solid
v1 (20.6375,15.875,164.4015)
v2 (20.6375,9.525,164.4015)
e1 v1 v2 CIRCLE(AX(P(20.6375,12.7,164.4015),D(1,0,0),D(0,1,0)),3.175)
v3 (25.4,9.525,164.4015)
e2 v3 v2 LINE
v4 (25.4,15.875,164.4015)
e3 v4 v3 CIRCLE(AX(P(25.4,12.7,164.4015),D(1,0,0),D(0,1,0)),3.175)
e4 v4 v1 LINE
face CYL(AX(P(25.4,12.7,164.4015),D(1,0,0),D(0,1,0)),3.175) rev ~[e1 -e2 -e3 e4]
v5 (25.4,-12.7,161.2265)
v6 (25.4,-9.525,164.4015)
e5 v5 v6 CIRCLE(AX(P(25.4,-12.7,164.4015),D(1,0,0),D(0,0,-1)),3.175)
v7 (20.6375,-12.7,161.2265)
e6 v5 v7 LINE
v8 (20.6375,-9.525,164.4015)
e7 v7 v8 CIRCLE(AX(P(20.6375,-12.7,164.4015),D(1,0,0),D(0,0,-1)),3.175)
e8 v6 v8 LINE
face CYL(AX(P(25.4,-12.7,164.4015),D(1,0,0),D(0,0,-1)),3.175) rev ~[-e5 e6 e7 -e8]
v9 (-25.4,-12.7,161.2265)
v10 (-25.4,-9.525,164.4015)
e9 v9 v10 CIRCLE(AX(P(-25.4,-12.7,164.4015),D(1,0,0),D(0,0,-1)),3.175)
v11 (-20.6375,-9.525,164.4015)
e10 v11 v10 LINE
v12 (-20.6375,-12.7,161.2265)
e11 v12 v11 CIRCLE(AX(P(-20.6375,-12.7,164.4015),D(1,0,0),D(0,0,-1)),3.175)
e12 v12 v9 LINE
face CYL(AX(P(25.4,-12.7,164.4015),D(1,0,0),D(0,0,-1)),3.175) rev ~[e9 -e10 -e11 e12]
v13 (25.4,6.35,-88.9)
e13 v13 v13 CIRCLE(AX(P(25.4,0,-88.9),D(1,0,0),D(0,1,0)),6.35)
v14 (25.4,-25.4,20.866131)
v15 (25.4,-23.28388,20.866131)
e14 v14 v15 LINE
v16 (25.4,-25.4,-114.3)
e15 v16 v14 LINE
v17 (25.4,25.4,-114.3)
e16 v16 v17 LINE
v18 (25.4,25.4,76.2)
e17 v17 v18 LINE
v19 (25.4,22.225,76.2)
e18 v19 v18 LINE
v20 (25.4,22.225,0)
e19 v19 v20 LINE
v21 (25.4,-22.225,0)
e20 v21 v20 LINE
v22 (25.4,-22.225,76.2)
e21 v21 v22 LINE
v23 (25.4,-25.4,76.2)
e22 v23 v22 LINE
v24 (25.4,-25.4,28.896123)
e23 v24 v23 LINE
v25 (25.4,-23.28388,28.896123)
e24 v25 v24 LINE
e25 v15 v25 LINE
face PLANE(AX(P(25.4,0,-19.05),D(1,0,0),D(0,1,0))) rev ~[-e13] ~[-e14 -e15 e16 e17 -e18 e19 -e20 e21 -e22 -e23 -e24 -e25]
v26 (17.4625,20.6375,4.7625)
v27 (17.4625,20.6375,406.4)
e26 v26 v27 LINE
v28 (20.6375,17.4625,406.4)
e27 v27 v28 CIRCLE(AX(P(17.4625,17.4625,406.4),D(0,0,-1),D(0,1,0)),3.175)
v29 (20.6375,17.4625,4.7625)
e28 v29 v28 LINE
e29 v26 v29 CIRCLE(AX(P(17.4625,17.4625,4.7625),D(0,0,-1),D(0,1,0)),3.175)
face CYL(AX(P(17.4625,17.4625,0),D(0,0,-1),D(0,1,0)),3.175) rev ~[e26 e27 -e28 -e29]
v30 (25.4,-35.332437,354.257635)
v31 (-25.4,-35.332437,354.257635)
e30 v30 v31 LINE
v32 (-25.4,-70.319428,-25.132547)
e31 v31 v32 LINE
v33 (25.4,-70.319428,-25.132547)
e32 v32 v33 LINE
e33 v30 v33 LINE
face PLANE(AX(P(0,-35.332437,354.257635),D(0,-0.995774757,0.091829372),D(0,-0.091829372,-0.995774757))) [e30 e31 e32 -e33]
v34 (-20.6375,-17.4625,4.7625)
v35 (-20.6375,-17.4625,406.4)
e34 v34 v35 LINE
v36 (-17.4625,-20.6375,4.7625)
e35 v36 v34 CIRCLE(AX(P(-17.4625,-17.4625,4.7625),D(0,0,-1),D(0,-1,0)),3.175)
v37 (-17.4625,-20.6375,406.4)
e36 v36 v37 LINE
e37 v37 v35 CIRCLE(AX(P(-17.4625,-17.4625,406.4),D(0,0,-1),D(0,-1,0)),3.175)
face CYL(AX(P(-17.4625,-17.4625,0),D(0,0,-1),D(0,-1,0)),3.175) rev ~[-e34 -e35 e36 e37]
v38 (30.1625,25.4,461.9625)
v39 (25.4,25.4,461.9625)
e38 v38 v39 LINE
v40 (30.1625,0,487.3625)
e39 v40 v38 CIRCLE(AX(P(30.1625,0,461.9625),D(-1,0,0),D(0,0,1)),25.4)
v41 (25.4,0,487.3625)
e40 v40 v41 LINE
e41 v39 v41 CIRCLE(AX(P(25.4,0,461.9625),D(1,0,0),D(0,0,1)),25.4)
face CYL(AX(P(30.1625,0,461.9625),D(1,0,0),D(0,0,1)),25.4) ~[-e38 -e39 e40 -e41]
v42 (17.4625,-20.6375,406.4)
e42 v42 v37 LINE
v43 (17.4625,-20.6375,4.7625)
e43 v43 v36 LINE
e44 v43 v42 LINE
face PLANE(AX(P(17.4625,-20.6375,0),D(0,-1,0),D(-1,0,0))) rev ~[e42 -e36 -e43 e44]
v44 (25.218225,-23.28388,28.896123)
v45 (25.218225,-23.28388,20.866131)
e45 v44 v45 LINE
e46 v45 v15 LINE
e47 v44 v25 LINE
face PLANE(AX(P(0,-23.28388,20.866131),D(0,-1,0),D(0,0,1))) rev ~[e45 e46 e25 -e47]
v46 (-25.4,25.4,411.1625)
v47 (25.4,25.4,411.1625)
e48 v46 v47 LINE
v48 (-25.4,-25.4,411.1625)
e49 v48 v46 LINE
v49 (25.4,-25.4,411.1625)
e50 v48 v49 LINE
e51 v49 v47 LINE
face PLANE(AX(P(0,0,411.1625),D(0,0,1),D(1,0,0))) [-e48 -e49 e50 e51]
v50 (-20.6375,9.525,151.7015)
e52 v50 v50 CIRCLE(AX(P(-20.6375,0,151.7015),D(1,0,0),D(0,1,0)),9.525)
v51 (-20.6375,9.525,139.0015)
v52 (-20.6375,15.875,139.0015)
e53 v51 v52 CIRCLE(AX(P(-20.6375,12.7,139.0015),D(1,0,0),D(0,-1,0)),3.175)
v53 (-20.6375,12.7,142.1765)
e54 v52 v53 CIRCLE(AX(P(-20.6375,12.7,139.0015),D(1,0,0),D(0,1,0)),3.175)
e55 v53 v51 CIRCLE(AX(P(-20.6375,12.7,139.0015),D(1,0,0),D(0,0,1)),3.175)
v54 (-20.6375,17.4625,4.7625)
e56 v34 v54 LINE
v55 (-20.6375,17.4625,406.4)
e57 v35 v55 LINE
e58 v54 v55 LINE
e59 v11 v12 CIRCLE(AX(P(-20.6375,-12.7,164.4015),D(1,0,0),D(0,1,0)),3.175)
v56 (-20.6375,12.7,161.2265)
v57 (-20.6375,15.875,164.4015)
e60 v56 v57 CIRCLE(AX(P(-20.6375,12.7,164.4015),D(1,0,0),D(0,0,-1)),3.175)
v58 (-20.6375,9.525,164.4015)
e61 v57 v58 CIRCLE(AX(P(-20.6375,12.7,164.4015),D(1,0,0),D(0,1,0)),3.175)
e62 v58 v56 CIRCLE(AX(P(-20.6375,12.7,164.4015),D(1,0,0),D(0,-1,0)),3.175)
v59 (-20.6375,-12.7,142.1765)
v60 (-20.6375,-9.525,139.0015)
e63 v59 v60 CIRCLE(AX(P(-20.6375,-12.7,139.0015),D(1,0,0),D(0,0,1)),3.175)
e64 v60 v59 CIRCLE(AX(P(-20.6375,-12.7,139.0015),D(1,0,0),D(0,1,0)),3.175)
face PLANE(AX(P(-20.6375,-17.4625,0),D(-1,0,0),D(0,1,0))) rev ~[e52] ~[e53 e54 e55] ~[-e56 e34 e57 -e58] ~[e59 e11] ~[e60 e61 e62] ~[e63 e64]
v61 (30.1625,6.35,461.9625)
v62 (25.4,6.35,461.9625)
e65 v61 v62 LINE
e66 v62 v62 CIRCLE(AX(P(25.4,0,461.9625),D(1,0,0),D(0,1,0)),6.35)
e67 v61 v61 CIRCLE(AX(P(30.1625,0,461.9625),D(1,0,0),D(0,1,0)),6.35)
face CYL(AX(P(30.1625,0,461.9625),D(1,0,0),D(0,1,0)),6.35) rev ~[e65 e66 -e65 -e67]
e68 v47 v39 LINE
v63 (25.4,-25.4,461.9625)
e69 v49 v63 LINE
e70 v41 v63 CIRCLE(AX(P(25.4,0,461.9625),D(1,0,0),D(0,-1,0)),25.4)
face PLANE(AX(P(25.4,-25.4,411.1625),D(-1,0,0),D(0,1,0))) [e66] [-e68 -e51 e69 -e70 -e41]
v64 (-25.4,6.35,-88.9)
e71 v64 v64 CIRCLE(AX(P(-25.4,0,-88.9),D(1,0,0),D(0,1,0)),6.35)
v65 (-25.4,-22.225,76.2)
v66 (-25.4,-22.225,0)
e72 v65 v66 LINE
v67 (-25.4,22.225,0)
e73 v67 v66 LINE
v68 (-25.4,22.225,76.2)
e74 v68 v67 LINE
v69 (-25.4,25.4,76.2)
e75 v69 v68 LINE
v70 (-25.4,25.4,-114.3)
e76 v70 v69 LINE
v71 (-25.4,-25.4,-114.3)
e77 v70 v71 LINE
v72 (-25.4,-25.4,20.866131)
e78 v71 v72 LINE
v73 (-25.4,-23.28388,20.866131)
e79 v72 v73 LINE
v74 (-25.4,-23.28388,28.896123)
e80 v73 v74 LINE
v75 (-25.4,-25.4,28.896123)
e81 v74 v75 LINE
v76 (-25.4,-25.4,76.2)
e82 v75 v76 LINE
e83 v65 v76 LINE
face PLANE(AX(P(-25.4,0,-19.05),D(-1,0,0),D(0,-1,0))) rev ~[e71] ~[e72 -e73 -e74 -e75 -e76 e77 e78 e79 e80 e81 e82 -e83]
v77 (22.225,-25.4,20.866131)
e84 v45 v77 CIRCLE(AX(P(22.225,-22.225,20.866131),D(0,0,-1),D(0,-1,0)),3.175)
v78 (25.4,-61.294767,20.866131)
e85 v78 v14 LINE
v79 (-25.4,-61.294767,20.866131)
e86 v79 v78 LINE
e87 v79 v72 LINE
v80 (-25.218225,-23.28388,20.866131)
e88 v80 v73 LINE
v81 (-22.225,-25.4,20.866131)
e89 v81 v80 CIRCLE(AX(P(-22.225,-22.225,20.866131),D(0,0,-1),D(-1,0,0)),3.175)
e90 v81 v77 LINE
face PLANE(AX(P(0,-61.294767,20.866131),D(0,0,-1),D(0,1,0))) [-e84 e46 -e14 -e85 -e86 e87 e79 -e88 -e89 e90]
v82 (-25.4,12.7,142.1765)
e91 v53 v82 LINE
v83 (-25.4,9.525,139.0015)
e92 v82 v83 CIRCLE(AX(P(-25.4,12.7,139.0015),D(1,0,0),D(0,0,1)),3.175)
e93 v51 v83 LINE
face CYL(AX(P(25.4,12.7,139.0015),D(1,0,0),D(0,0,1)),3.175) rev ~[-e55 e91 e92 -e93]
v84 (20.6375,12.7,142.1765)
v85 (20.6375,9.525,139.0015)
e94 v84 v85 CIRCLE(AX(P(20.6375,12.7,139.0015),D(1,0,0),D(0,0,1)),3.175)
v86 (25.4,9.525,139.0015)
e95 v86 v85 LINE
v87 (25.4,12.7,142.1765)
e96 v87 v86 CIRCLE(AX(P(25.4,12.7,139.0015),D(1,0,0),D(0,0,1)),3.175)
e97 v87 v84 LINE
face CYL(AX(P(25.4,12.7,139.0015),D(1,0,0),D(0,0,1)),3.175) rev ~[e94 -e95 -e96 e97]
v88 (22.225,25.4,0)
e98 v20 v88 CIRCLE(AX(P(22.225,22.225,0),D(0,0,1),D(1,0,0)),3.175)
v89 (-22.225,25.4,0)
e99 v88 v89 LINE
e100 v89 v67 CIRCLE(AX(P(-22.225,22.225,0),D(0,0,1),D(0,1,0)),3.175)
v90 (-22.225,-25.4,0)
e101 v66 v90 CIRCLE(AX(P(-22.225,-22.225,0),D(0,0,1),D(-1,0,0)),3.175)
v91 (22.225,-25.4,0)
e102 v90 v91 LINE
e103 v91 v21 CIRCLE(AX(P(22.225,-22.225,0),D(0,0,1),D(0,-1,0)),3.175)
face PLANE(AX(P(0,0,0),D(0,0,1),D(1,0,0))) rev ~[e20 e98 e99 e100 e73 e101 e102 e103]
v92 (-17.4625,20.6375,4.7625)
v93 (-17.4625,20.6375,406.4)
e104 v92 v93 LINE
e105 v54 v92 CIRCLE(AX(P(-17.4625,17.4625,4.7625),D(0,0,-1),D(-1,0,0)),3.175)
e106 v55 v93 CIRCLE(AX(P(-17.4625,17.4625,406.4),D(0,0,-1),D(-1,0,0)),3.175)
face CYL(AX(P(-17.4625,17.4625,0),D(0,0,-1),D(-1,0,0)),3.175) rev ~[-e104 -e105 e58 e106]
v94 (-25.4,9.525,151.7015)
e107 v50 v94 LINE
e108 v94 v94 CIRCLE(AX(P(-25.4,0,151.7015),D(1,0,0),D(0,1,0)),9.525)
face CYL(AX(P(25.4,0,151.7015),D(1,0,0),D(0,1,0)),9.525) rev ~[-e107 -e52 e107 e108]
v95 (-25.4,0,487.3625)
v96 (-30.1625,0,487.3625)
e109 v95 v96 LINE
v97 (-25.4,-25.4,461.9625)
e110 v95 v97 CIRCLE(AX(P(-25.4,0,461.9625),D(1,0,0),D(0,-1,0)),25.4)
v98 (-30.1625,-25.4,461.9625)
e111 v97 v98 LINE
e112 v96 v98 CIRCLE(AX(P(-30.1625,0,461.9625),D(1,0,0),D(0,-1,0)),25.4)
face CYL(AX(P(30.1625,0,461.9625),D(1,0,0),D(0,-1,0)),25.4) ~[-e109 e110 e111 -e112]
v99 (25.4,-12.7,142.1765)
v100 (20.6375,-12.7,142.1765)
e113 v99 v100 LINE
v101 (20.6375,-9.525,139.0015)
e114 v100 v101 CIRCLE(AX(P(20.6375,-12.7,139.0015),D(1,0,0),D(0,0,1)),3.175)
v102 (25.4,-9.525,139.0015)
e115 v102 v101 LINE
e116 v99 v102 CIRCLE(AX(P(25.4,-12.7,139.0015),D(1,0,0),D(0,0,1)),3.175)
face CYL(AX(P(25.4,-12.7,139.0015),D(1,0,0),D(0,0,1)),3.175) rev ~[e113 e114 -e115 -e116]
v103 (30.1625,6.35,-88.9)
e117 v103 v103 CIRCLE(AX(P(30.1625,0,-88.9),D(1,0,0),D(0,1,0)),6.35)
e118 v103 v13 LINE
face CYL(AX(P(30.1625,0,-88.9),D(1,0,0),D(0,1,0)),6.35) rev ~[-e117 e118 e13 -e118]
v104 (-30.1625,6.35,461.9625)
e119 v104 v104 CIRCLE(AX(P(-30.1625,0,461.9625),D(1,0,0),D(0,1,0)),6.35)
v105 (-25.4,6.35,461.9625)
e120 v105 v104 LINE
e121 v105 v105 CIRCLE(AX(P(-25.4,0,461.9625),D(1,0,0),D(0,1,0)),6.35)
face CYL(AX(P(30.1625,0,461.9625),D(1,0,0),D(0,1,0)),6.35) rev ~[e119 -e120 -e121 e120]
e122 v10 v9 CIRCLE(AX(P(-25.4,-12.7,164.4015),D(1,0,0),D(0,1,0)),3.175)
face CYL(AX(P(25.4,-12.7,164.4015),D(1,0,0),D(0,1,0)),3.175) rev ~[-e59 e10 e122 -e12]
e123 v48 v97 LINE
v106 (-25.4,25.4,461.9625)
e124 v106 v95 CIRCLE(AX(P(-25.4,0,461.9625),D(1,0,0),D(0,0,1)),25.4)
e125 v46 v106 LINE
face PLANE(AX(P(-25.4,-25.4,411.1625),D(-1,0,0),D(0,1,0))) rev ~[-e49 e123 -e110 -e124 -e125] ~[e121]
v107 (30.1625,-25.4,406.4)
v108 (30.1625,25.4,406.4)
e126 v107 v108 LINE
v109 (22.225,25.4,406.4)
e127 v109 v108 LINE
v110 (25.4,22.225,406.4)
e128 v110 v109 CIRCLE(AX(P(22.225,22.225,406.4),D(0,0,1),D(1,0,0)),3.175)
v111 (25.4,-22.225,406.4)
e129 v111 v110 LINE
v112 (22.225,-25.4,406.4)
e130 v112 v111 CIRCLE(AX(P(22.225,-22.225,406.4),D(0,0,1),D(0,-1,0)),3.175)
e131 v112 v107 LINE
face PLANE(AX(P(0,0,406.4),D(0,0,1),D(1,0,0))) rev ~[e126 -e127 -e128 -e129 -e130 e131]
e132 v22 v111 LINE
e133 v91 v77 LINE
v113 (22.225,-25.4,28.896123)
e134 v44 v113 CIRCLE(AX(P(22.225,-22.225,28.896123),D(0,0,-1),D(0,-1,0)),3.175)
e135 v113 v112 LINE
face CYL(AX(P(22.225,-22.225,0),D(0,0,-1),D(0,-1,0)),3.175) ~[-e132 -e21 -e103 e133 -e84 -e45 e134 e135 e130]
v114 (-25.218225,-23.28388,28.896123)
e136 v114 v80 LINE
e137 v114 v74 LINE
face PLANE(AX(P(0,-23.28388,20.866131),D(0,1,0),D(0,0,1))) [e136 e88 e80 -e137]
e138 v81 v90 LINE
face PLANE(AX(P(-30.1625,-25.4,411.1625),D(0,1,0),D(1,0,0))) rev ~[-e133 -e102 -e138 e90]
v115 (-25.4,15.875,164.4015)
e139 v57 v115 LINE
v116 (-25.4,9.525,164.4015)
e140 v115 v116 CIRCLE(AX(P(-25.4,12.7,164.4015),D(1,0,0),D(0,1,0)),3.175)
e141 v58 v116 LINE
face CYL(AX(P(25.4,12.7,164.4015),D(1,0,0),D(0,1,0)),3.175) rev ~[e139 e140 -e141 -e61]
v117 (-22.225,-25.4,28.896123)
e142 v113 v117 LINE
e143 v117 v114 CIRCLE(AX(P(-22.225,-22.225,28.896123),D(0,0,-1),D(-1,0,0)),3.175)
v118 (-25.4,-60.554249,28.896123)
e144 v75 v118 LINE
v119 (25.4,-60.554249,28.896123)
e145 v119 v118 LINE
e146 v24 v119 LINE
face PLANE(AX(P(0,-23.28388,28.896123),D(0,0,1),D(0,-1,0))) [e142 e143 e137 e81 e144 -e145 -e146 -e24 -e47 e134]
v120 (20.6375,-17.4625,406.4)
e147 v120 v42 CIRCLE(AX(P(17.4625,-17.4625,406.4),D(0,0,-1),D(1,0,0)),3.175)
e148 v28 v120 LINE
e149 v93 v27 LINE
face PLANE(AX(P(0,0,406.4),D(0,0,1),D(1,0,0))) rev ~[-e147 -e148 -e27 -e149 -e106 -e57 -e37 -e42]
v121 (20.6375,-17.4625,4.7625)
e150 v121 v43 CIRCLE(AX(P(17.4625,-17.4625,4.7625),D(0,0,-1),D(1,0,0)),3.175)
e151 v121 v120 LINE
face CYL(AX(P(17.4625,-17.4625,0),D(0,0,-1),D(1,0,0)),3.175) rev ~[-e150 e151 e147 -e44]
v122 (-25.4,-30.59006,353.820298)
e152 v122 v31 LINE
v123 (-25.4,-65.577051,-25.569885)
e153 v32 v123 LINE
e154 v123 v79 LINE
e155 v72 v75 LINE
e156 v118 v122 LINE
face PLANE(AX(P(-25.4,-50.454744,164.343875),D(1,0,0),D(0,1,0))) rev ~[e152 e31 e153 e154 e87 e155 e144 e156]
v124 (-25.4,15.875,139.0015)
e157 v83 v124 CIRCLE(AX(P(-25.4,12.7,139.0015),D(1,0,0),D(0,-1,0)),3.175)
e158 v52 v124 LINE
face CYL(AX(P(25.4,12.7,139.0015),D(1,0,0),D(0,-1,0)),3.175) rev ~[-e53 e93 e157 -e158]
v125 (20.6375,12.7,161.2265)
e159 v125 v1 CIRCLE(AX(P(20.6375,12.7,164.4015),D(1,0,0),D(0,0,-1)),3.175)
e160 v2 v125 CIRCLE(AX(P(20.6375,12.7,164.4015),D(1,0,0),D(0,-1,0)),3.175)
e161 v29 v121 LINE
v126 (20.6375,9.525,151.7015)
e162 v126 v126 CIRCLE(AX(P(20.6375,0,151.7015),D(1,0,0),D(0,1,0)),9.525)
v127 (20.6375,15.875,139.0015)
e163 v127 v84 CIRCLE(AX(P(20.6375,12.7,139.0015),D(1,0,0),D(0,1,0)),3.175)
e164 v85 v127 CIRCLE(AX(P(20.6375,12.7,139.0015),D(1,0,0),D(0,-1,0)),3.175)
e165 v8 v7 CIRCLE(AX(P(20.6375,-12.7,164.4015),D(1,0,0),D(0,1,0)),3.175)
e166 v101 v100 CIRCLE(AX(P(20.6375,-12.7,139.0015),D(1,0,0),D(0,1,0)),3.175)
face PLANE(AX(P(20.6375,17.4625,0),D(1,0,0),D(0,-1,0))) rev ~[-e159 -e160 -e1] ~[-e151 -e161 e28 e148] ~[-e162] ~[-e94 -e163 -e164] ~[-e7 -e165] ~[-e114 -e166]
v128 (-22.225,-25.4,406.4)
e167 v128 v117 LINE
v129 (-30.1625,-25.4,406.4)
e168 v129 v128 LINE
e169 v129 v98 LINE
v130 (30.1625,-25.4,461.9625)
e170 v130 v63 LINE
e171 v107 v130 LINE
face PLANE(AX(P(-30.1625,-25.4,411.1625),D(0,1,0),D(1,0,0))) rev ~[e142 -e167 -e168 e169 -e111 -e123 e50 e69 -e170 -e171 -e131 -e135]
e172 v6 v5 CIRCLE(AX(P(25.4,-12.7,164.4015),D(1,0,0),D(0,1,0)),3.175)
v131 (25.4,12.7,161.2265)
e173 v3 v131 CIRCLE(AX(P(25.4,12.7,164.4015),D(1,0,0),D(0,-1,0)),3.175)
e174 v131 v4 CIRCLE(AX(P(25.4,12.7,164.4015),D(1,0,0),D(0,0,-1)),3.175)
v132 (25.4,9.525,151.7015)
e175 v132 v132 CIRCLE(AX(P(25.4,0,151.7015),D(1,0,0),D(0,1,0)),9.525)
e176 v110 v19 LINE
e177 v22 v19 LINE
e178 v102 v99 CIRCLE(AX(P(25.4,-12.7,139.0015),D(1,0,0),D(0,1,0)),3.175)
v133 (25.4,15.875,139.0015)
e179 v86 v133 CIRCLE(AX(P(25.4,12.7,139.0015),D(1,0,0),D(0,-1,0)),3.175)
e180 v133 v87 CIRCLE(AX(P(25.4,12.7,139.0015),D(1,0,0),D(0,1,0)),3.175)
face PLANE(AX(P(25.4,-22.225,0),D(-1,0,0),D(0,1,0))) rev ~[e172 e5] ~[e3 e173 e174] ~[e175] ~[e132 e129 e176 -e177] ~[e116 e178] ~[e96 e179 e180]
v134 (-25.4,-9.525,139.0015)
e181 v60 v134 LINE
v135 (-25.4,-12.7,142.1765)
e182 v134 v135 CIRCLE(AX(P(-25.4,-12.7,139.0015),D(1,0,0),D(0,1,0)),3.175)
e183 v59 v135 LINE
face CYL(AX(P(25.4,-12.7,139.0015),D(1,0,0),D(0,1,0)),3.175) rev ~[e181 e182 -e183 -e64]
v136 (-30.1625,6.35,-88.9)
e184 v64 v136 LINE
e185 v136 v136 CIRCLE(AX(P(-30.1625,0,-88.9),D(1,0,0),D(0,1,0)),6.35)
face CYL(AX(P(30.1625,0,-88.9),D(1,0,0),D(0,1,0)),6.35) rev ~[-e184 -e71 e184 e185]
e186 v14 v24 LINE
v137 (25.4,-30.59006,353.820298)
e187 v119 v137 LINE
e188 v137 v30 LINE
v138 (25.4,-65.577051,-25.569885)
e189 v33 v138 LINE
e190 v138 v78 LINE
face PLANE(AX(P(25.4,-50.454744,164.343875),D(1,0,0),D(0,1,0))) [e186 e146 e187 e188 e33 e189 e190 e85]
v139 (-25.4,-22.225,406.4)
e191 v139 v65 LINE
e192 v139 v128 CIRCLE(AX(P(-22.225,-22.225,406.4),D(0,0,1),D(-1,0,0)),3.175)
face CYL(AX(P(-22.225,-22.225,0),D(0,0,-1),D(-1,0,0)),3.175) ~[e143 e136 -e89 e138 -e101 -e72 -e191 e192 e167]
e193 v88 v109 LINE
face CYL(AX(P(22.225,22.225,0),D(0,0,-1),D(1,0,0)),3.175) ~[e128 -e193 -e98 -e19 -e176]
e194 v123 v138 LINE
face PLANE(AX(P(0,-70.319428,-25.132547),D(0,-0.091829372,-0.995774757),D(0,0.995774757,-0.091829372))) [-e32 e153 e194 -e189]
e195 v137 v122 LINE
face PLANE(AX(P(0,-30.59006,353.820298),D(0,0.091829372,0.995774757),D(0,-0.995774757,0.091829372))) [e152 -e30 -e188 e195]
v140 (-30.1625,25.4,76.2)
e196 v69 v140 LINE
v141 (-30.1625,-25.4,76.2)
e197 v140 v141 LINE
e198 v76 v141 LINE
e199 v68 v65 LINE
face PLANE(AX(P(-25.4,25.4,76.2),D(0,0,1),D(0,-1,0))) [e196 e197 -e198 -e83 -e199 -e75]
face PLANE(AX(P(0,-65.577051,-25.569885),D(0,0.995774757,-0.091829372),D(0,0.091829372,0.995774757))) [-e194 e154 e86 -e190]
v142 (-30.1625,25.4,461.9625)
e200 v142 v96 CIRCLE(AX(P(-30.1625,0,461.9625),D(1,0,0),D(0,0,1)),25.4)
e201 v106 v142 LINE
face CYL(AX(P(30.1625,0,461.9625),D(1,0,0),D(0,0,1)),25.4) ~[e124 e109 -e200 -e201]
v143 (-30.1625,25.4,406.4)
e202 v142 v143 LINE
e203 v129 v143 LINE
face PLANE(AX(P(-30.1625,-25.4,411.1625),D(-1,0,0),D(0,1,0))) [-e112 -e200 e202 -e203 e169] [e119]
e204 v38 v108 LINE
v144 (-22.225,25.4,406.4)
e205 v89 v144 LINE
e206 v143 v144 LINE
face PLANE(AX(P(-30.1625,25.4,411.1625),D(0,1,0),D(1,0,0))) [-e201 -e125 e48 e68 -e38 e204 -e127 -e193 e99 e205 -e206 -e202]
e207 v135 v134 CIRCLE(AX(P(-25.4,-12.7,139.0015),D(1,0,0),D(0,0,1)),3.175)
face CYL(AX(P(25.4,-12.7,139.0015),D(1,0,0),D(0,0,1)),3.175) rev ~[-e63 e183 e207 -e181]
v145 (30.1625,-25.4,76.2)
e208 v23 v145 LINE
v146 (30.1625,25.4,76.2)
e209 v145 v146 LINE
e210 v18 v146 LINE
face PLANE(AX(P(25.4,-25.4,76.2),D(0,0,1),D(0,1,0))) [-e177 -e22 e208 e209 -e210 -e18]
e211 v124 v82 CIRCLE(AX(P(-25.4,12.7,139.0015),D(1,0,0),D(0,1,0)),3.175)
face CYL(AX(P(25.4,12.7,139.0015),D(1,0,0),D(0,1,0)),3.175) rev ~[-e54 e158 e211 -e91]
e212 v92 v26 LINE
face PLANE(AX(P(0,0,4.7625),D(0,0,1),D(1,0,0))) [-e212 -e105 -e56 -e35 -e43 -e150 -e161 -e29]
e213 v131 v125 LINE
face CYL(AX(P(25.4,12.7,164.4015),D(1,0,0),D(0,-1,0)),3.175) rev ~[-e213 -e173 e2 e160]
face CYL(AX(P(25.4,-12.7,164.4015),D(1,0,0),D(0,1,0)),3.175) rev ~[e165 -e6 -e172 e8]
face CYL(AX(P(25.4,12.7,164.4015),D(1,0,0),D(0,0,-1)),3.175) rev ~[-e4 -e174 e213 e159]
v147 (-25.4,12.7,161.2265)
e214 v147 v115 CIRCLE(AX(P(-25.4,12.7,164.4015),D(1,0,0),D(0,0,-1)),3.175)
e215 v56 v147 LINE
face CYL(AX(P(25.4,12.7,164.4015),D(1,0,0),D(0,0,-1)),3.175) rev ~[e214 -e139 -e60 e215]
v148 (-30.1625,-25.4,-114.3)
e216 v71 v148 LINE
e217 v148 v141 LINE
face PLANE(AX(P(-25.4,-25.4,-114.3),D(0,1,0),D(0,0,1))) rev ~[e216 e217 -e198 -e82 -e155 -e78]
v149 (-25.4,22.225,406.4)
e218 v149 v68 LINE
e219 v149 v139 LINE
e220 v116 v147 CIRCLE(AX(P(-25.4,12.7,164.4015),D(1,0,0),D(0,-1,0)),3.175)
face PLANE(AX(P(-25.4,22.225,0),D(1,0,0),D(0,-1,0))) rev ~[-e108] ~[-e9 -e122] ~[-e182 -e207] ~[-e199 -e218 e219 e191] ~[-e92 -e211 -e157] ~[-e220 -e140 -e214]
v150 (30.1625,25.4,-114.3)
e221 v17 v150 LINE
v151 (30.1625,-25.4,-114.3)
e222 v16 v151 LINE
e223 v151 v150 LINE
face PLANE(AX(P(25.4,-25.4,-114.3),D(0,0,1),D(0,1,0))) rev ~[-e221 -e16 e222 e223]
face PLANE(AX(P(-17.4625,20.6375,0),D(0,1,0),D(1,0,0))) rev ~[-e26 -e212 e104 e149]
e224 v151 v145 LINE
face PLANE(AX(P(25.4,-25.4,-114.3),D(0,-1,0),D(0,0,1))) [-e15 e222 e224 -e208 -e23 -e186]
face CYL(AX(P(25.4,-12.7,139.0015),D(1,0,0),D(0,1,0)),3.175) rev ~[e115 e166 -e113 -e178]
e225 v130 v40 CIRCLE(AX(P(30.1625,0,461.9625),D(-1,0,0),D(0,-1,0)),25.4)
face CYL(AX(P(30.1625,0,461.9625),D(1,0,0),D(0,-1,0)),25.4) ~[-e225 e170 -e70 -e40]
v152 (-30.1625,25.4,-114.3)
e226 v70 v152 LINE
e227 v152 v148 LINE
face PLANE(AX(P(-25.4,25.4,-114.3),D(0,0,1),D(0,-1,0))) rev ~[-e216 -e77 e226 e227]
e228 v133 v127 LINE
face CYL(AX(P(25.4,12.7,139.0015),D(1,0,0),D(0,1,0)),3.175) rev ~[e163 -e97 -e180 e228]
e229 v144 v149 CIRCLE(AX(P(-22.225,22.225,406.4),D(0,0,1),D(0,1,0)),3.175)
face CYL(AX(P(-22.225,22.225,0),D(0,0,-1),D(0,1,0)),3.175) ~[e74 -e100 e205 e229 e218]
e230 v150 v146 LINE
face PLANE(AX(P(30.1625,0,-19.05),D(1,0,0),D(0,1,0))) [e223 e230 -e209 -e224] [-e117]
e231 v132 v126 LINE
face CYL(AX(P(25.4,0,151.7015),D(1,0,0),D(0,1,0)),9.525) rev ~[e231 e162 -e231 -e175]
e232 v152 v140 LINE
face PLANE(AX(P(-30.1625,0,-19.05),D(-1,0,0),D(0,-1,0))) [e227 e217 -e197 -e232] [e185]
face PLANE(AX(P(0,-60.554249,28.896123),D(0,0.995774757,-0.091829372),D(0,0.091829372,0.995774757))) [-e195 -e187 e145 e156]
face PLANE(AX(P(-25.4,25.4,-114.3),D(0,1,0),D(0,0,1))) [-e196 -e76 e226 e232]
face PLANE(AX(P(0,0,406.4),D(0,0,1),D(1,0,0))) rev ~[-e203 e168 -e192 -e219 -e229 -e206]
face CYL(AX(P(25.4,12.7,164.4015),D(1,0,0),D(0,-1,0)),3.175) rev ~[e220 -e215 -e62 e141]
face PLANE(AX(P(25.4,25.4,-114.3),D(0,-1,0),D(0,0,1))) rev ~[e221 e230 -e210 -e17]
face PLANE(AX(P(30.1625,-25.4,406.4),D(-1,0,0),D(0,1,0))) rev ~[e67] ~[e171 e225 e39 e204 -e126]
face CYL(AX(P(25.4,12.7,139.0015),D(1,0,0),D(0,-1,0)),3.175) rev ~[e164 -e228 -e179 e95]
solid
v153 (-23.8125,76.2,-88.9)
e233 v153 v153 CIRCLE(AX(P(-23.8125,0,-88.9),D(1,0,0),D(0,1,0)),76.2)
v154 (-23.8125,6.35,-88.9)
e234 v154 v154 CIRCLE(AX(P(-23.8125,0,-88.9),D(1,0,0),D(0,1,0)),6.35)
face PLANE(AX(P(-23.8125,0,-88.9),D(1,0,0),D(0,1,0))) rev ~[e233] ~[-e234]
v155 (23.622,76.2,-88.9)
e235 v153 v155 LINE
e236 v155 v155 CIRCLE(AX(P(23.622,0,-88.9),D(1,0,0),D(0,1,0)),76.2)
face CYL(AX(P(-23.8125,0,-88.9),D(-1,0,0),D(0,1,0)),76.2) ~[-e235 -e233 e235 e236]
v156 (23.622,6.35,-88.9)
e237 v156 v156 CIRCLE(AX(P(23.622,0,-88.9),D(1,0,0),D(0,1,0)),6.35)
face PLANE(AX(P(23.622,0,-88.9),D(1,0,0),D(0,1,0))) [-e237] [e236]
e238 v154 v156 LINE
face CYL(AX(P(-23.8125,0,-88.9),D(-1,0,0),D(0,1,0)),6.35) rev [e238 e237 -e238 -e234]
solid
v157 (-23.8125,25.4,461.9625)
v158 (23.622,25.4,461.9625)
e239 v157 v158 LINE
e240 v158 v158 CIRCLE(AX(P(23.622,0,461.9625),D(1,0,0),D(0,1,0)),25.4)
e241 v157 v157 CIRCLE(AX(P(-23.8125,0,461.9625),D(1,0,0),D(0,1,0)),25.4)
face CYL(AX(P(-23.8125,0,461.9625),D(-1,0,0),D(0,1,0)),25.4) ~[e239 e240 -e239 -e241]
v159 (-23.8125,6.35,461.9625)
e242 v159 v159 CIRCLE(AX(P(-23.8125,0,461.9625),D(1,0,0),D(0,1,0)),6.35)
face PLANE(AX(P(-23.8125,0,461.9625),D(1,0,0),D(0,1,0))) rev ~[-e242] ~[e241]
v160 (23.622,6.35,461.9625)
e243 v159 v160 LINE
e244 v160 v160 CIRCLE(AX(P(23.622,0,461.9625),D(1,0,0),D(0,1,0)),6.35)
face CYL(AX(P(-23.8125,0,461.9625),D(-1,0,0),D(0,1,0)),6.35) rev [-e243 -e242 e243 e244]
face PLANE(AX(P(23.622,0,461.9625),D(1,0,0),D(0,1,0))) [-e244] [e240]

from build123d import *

# Parameters (mm, degrees)
F1_DEPTH       = 406.4
F2_W           = 60.325
F2_H           = 50.8
F3_DEPTH       = 4.7625
F4_W           = 4.7625
F4_H           = 50.8
F5_DEPTH       = 76.2
F6_R           = 6.35
F7_DEPTH       = 60.326
F9_DEPTH       = 4.7625
F10_W          = 50.8
F10_H          = 190.5
F11_DEPTH      = 4.7625
F12_W          = 50.8
F12_H          = 190.5
F13_DEPTH      = 4.7625
F14_R          = 6.35
F15_DEPTH      = 60.326
F17_DEPTH      = 60.326
F19_START      = 1.5875
F18_R          = 6.35
F19_DEPTH      = 47.4345
F21_START      = 1.5875
F20_R          = 76.2
F20_R_2        = 6.35
F21_DEPTH      = 47.4345
F23_DEPTH      = 25.4
F23_DEPTH_BACK = 25.4
F24_R          = 9.525
F25_DEPTH      = 55.5635


with BuildPart() as f1:
    # F0 (on Top) → F1 (new body)
    with BuildSketch(Plane.XY):
        with BuildLine():
            ThreePointArc((25.4, 22.225), (24.4700640303, 24.4700640303), (22.225, 25.4))
            Line((22.225, 25.4), (-22.225, 25.4))
            ThreePointArc((-22.225, 25.4), (-24.4700640303, 24.4700640303), (-25.4, 22.225))
            Line((-25.4, 22.225), (-25.4, -22.225))
            ThreePointArc((-25.4, -22.225), (-24.4700640303, -24.4700640303), (-22.225, -25.4))
            Line((-22.225, -25.4), (22.225, -25.4))
            ThreePointArc((22.225, -25.4), (24.4700640303, -24.4700640303), (25.4, -22.225))
            Line((25.4, -22.225), (25.4, 22.225))
        make_face()
        with BuildLine():
            Line((-17.4625, 20.6375), (17.4625, 20.6375))
            ThreePointArc((17.4625, 20.6375), (19.7075640303, 19.7075640303), (20.6375, 17.4625))
            Line((20.6375, 17.4625), (20.6375, -17.4625))
            ThreePointArc((20.6375, -17.4625), (19.7075640303, -19.7075640303), (17.4625, -20.6375))
            Line((17.4625, -20.6375), (-17.4625, -20.6375))
            ThreePointArc((-17.4625, -20.6375), (-19.7075640303, -19.7075640303), (-20.6375, -17.4625))
            Line((-20.6375, -17.4625), (-20.6375, 17.4625))
            ThreePointArc((-20.6375, 17.4625), (-19.7075640303, 19.7075640303), (-17.4625, 20.6375))
        make_face(mode=Mode.SUBTRACT)
    extrude(amount=F1_DEPTH)

    # F2 (on face) → F3 (join)
    with BuildSketch(Plane.XY.offset(406.4)):
        Rectangle(F2_W, F2_H)
    extrude(amount=F3_DEPTH)

    # F4 (on face) → F5 (join)
    with BuildSketch(Plane.XY.offset(411.1625)):
        with Locations((-27.78125, 0)):
            Rectangle(F4_W, F4_H)
        with Locations((27.78125, 0)):
            Rectangle(F4_W, F4_H)
    extrude(amount=F5_DEPTH)

    # F6 (on face) → F7 (cut, through all)
    with BuildSketch(Plane.YZ.offset(30.1625)):
        with Locations((0, 461.9625)):
            Circle(F6_R)
    extrude(amount=-F7_DEPTH, mode=Mode.SUBTRACT)

    # F8 (on Top) → F9 (join)
    with BuildSketch(Plane.XY):
        with BuildLine():
            Line((-22.225, -25.4), (22.225, -25.4))
            ThreePointArc((22.225, -25.4), (24.4700640303, -24.4700640303), (25.4, -22.225))
            Line((25.4, -22.225), (25.4, 22.225))
            ThreePointArc((25.4, 22.225), (24.4700640303, 24.4700640303), (22.225, 25.4))
            Line((22.225, 25.4), (-22.225, 25.4))
            ThreePointArc((-22.225, 25.4), (-24.4700640303, 24.4700640303), (-25.4, 22.225))
            Line((-25.4, 22.225), (-25.4, -22.225))
            ThreePointArc((-25.4, -22.225), (-24.4700640303, -24.4700640303), (-22.225, -25.4))
        make_face()
    extrude(amount=F9_DEPTH)

    # F10 (on face) → F11 (join)
    with BuildSketch(Plane.YZ.offset(25.4)):
        with Locations((0, -19.05)):
            Rectangle(F10_W, F10_H)
    extrude(amount=F11_DEPTH)

    # F12 (on face) → F13 (join)
    with BuildSketch(Plane(origin=(-25.4, 0, 0), x_dir=(0, -1, 0), z_dir=(-1, 0, 0))):
        with Locations((0, -19.05)):
            Rectangle(F12_W, F12_H)
    extrude(amount=F13_DEPTH)

    # F14 (on face) → F15 (cut, through all)
    with BuildSketch(Plane.YZ.offset(30.1625)):
        with Locations((0, -88.9)):
            Circle(F14_R)
    extrude(amount=-F15_DEPTH, mode=Mode.SUBTRACT)

    # F16 (on face) → F17 (cut, through all)
    with BuildSketch(Plane.YZ.offset(30.1625)):
        with BuildLine():
            ThreePointArc((0, 487.3625000002), (17.9605122422, 479.9230122422), (25.4000000002, 461.9625))
            Line((25.4, 461.9625), (25.4, 487.3625))
            Line((25.4, 487.3625), (0, 487.3625))
        make_face()
        with BuildLine():
            Line((-25.4, 487.3625), (-25.4, 461.9625))
            ThreePointArc((-25.4000000002, 461.9625), (-17.9605122422, 479.9230122422), (0, 487.3625000002))
            Line((0, 487.3625), (-25.4, 487.3625))
        make_face()
    extrude(amount=-F17_DEPTH, mode=Mode.SUBTRACT)

    # F22 (on Right) → F23 (join, two sides)
    with BuildSketch(Plane.YZ) as f23_sk:
        Polygon((-35.3324371131, 354.2576350563), (-70.3194279932, -25.132547301), (-65.5770507137, -25.569884687), (-61.2947668437, 20.8661310292), (-60.5542488364, 28.896123171), (-30.5900598336, 353.8202976703), align=None)
        Polygon((-60.5542488364, 28.896123171), (-61.2947668437, 20.8661310292), (-23.283880204, 20.8661310292), (-23.283880204, 28.896123171), align=None)
    extrude(amount=F23_DEPTH)
    extrude(f23_sk.sketch, amount=-F23_DEPTH_BACK)

    # F24 (on face) → F25 (cut, through all)
    with BuildSketch(Plane.YZ.offset(25.4)):
        with Locations((0, 151.7015000002)):
            Circle(F24_R)
        with BuildLine():
            Line((12.7, 161.2265000002), (12.7, 164.4015000002))
            Line((12.7, 164.4015000002), (9.525, 164.4015000002))
            ThreePointArc((9.525, 164.4015000002), (10.4549359697, 162.1564359699), (12.7, 161.2265000002))
        make_face()
        with BuildLine():
            Line((9.525, 164.4015000002), (12.7, 164.4015000002))
            Line((12.7, 164.4015000002), (12.7, 161.2265000002))
            ThreePointArc((12.7, 161.2265000002), (14.9450640303, 162.1564359699), (15.875, 164.4015000002))
            ThreePointArc((15.875, 164.4015000002), (12.7, 167.5765000002), (9.525, 164.4015000002))
        make_face()
        with BuildLine():
            Line((12.7, 142.1765000002), (12.7, 139.0015000002))
            Line((12.7, 139.0015000002), (9.525, 139.0015000002))
            ThreePointArc((9.525, 139.0015000002), (12.7, 135.8265000002), (15.875, 139.0015000002))
            ThreePointArc((15.875, 139.0015000002), (14.9450640303, 141.2465640304), (12.7, 142.1765000002))
        make_face()
        with BuildLine():
            Line((9.525, 139.0015000002), (12.7, 139.0015000002))
            Line((12.7, 139.0015000002), (12.7, 142.1765000002))
            ThreePointArc((12.7, 142.1765000002), (10.4549359697, 141.2465640304), (9.525, 139.0015000002))
        make_face()
        with BuildLine():
            Line((-9.525, 164.4015000002), (-12.7, 164.4015000002))
            Line((-12.7, 164.4015000002), (-12.7, 161.2265000002))
            ThreePointArc((-12.7, 161.2265000002), (-10.4549359697, 162.1564359699), (-9.525, 164.4015000002))
        make_face()
        with BuildLine():
            Line((-12.7, 161.2265000002), (-12.7, 164.4015000002))
            Line((-12.7, 164.4015000002), (-9.525, 164.4015000002))
            ThreePointArc((-9.525, 164.4015000002), (-14.9450640303, 166.6465640304), (-12.7, 161.2265000002))
        make_face()
        with BuildLine():
            Line((-12.7, 139.0015000002), (-9.525, 139.0015000002))
            ThreePointArc((-9.525, 139.0015000002), (-10.4549359697, 141.2465640304), (-12.7, 142.1765000002))
            Line((-12.7, 142.1765000002), (-12.7, 139.0015000002))
        make_face()
        with BuildLine():
            ThreePointArc((-12.7, 142.1765000002), (-14.9450640303, 136.7564359699), (-9.525, 139.0015000002))
            Line((-9.525, 139.0015000002), (-12.7, 139.0015000002))
            Line((-12.7, 139.0015000002), (-12.7, 142.1765000002))
        make_face()
    extrude(amount=-F25_DEPTH, mode=Mode.SUBTRACT)


with BuildPart() as f19:
    # F18 (on face) → F19 (new body)
    with BuildSketch(Plane.YZ.offset(-25.4).offset(F19_START)):
        with BuildLine():
            ThreePointArc((-25.4, 461.9625), (0, 436.5625), (25.4, 461.9625))
            ThreePointArc((25.4, 461.9625), (0, 487.3625), (-25.4, 461.9625))
        make_face()
        with Locations((0, 461.9625)):
            Circle(F18_R, mode=Mode.SUBTRACT)
    extrude(amount=F19_DEPTH)


with BuildPart() as f21:
    # F20 (on face) → F21 (new body)
    with BuildSketch(Plane.YZ.offset(-25.4).offset(F21_START)):
        with Locations((0, -88.9)):
            Circle(F20_R)
        with Locations((0, -88.9)):
            Circle(F20_R_2, mode=Mode.SUBTRACT)
    extrude(amount=F21_DEPTH)


solid = Compound([f1.part, f19.part, f21.part])
